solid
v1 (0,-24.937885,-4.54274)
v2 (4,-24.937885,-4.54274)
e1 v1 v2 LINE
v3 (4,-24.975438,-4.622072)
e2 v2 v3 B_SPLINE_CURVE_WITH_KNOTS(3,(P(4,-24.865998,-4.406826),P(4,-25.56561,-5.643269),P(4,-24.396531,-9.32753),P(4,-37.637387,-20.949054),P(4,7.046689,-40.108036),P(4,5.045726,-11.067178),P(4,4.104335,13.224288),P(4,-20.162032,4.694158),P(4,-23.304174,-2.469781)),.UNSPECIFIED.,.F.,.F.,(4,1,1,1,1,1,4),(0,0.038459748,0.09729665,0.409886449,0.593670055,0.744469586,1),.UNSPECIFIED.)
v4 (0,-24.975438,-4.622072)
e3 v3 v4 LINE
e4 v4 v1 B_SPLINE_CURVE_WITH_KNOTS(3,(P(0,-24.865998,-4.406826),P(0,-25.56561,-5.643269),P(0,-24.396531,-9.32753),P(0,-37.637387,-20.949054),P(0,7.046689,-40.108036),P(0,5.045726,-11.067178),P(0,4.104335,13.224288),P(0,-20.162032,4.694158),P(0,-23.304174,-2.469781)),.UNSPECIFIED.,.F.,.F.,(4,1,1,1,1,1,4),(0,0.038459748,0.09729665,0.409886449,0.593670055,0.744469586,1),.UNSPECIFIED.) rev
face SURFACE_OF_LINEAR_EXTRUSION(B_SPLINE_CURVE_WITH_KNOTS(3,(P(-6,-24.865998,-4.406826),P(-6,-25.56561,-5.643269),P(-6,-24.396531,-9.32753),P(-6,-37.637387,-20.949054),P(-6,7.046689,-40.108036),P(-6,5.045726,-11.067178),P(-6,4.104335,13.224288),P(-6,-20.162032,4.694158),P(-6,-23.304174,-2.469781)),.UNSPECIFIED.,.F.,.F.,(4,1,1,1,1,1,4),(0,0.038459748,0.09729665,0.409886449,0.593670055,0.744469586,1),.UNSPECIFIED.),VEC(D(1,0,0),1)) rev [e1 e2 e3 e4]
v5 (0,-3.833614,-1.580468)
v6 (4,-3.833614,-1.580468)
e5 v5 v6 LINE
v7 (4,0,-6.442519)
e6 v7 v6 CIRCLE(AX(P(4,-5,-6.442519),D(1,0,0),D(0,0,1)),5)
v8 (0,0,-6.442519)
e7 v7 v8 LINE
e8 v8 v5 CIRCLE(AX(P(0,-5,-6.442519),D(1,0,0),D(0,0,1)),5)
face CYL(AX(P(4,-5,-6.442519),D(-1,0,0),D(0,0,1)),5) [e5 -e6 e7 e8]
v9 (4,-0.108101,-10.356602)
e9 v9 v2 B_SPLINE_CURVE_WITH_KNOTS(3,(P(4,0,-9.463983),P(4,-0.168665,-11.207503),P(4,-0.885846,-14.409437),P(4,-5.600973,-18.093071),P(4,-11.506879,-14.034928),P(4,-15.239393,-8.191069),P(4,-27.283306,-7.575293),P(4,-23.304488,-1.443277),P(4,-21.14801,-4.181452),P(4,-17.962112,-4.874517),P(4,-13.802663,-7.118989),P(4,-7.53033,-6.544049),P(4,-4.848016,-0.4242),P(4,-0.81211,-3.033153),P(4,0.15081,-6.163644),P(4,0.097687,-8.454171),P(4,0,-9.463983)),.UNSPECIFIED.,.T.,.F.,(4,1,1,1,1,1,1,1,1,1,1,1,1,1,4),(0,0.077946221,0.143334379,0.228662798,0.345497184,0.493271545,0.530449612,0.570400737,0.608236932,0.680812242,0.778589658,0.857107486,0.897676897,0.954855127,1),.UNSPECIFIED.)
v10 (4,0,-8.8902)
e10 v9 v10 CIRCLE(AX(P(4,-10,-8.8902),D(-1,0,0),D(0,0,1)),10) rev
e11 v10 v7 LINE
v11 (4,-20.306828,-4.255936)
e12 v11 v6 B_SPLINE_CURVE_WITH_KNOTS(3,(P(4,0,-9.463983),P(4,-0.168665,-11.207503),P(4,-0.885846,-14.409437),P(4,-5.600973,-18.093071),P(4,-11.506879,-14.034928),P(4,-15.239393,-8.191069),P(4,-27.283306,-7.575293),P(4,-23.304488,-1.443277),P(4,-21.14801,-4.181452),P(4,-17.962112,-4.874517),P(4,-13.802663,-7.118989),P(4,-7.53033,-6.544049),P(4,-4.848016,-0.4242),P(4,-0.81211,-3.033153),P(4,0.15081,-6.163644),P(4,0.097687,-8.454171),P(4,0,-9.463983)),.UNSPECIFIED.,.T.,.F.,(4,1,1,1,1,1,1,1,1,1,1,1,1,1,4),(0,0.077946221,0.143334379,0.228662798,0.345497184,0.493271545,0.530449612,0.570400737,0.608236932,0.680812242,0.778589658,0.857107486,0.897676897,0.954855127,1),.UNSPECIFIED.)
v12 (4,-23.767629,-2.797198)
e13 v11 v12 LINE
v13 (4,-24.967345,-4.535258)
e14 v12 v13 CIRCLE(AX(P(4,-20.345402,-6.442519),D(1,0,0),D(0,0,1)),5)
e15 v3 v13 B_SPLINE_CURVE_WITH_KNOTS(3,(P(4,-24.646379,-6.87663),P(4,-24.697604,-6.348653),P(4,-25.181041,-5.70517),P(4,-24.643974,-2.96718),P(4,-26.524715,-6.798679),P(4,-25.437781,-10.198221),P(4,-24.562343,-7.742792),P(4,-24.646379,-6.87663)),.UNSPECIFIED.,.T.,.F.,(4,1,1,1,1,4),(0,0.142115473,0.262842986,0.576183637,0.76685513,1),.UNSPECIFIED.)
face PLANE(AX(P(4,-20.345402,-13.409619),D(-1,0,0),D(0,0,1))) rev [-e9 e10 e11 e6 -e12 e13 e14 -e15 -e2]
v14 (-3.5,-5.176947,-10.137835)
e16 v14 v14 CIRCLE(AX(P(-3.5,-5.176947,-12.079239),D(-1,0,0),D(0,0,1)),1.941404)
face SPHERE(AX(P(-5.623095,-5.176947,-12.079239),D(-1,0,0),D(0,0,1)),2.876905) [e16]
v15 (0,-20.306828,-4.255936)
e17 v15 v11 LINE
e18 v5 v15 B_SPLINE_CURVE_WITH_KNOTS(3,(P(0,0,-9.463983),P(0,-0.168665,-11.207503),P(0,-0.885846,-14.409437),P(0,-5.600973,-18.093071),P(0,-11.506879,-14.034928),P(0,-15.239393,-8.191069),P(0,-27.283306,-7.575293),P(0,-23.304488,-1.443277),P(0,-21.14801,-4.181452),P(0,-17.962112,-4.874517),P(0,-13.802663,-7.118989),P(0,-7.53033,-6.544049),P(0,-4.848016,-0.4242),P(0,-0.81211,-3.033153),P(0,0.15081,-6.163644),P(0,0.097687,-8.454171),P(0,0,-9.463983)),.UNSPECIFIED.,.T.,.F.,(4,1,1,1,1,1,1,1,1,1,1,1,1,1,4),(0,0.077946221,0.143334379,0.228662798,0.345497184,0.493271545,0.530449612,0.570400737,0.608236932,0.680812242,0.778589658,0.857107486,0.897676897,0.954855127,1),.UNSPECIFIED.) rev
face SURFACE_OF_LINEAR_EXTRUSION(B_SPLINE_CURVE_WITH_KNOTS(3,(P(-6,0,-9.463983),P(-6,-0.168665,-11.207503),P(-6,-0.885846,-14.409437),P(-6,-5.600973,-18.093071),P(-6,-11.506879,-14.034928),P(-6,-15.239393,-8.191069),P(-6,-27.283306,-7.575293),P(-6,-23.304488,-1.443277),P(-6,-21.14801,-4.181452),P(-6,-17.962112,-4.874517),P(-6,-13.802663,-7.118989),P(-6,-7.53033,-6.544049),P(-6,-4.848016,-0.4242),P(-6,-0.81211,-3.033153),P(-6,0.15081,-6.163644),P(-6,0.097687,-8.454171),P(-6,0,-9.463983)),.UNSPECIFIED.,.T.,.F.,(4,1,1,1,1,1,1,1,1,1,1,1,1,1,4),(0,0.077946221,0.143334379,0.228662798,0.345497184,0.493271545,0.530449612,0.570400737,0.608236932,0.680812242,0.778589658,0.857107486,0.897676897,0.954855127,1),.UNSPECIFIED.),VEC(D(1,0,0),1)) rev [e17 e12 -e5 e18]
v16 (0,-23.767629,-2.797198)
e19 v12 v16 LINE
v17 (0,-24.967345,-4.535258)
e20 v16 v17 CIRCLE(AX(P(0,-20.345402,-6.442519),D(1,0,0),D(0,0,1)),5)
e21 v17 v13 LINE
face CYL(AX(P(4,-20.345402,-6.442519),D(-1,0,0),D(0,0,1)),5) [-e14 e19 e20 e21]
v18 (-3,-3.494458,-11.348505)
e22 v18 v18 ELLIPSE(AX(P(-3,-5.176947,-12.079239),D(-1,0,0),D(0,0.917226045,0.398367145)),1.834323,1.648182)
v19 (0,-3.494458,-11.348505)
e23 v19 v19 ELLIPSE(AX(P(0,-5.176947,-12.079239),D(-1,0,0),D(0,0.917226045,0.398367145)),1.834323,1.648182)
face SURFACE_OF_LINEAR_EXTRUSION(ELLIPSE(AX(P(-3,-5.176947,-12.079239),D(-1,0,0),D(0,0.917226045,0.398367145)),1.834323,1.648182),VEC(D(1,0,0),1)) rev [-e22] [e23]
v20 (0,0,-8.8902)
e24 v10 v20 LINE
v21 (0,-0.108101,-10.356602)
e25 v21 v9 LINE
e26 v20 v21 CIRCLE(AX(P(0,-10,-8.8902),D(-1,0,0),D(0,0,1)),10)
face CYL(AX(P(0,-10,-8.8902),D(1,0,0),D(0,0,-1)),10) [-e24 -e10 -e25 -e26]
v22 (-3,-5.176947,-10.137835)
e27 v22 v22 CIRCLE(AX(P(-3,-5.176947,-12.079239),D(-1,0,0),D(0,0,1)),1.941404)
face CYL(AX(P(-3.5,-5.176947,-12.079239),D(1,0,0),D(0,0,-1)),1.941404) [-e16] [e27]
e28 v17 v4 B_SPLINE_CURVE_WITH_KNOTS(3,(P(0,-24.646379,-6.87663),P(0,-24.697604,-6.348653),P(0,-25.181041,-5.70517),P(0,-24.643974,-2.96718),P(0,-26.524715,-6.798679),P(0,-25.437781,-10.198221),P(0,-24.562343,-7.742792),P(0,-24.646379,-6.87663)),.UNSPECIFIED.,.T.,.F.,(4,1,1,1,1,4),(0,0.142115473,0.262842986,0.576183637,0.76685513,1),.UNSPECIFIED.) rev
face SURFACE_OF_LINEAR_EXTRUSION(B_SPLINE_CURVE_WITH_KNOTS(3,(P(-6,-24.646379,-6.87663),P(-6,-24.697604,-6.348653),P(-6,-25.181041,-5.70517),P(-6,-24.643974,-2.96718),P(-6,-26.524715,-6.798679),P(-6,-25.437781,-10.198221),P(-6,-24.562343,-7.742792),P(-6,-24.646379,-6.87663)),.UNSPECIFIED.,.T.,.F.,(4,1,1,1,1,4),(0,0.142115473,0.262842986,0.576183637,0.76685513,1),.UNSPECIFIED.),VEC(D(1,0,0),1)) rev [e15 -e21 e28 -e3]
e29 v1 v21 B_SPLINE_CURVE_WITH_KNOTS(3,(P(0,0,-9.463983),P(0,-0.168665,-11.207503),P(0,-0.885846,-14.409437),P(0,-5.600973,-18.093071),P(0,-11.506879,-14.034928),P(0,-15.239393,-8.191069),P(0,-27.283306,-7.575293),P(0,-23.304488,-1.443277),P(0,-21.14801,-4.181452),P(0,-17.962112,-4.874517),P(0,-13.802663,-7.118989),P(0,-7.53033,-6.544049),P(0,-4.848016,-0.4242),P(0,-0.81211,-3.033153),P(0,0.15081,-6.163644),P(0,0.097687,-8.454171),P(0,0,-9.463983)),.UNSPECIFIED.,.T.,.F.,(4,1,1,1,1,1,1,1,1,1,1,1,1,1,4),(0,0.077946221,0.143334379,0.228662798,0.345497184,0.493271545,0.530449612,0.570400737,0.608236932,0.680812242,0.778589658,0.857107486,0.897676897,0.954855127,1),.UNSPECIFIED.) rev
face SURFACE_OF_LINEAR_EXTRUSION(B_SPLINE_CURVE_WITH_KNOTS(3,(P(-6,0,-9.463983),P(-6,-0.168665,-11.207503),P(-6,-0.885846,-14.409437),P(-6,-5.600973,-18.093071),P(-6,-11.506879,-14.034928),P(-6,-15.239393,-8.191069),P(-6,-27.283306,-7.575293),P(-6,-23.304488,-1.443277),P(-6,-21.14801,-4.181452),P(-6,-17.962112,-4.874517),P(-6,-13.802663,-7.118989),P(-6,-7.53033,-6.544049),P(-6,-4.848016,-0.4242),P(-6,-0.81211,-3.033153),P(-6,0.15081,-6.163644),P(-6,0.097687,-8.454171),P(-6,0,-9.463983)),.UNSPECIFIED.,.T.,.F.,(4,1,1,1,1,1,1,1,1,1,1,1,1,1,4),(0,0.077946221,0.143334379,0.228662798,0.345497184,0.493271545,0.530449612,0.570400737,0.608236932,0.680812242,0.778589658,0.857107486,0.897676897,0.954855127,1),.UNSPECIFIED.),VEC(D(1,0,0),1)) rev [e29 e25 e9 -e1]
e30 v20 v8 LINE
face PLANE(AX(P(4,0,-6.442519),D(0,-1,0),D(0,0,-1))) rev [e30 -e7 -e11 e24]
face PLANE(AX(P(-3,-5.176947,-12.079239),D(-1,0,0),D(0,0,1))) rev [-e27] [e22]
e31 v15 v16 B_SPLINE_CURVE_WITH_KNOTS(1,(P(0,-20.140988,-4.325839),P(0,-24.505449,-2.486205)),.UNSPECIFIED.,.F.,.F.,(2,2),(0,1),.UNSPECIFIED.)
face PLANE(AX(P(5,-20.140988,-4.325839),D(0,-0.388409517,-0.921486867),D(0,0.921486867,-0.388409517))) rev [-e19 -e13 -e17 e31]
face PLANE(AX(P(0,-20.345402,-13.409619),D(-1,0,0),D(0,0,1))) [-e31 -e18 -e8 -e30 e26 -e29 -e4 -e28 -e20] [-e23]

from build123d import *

# Parameters (mm, degrees)
BOSS_EXTRUDE1_DEPTH = 4
CUT_EXTRUDE3_START  = -10
CUT_EXTRUDE3_DEPTH  = 10
CUT_EXTRUDE4_DEPTH  = 10
FILLET4_START       = -1
FILLET4_DEPTH       = 6
SKETCH7_RX          = 1.83432271
SKETCH7_RY          = 1.648181576
BOSS_EXTRUDE2_DEPTH = 3
SKETCH8_R           = 1.941403724
BOSS_EXTRUDE3_DEPTH = 0.5
DOME1_FACE_RADIUS   = 1.941403724
DOME1_HEIGHT        = 5
CUT_EXTRUDE5_DEPTH  = 5


with BuildPart() as part:
    # Sketch1 → Boss-Extrude1 (new body)
    with BuildSketch(Plane(origin=(0, 0, 0), x_dir=(0, 0, -1), z_dir=(1, 0, 0))):
        with BuildLine():
            Line((6.442518848, 0), (13.409619329, 0))
            ThreePointArc((13.409619329, 0), (16.945153235, -1.464466094), (18.409619329, -5))
            Line((18.409619329, -5), (18.409619329, -20.34540211))
            ThreePointArc((18.409619329, -20.34540211), (16.945153235, -23.880936016), (13.409619329, -25.34540211))
            Line((13.409619329, -25.34540211), (6.442518848, -25.34540211))
            ThreePointArc((6.442518848, -25.34540211), (2.906984942, -23.880936016), (1.442518848, -20.34540211))
            Line((1.442518848, -20.34540211), (1.442518848, -5))
            ThreePointArc((1.442518848, -5), (2.906984942, -1.464466094), (6.442518848, 0))
        make_face()
    extrude(amount=BOSS_EXTRUDE1_DEPTH)

    # Sketch2 → Cut-Extrude3 (cut)
    with BuildSketch(Plane(origin=(4, 0, 0), x_dir=(0, 0, -1), z_dir=(1, 0, 0)).offset(CUT_EXTRUDE3_START)):
        with BuildLine():
            add(Edge.make_bspline(
                [(2.42884403, -23.286077848), (2.370716158, -22.573896831), (4.185530255, -21.12926271), (4.874517164, -17.962112227), (7.118988975, -13.802662727), (6.544049448, -7.530329658), (1.569055746, -5.349803368), (1.58046752, -3.833613753)],
                knots=[0.531334438, 0.531334438, 0.531334438, 0.531334438, 0.570400737, 0.608236932, 0.680812242, 0.778589658, 0.857107486, 0.857107486, 0.857107486, 0.857107486], degree=3))
            ThreePointArc((1.58046752, -3.833613753), (1.47712578, -4.412742239), (1.442518848, -5))
            Line((1.442518848, -5), (1.442518848, -20.34540211))
            ThreePointArc((1.442518848, -20.34540211), (1.683757797, -21.87974016), (2.384196149, -23.266021372))
            add(Edge.make_bspline(
                [(2.384196149, -23.266021372), (2.399070873, -23.272759012), (2.413953527, -23.279444568), (2.428844038, -23.286077844)],
                knots=[0.998981394, 0.998981394, 0.998981394, 0.998981394, 0.999513034, 0.999513034, 0.999513034, 0.999513034], degree=3))
        make_face()
        with BuildLine():
            Line((13.409619329, 0), (9.46398266, 0))
            add(Edge.make_bspline(
                [(9.46398266, 0), (11.207503001, -0.168664697), (14.40943711, -0.885845558), (18.093070912, -5.600973008), (14.034927819, -11.50687924), (8.23474836, -15.211494887), (7.662204752, -25.591568315), (4.542739971, -24.937885151)],
                knots=[0, 0, 0, 0, 0.077946221, 0.143334379, 0.228662798, 0.345497184, 0.490655992, 0.490655992, 0.490655992, 0.490655992], degree=3))
            add(Edge.make_bspline(
                [(4.54273997, -24.937885153), (5.749127141, -25.532851997), (7.208451258, -25.09277451), (8.521498661, -25.334156754), (8.57622256, -25.34540211)],
                knots=[0.001400322, 0.001400322, 0.001400322, 0.001400322, 0.038459748, 0.040079073, 0.040079073, 0.040079073, 0.040079073], degree=3))
            Line((8.57622256, -25.34540211), (13.409619329, -25.34540211))
            ThreePointArc((13.409619329, -25.34540211), (16.945153235, -23.880936016), (18.409619329, -20.34540211))
            Line((18.409619329, -20.34540211), (18.409619329, -5))
            ThreePointArc((18.409619329, -5), (16.945153235, -1.464466094), (13.409619329, 0))
        make_face()
        with BuildLine():
            ThreePointArc((2.906984942, -1.464466094), (4.529101686, -0.380602337), (6.442518848, 0))
            add(Edge.make_bspline(
                [(6.442518848, 0), (7.443592251, 0.121124965), (8.454170968, 0.097687179), (9.46398266, 0)],
                knots=[0.954855127, 0.954855127, 0.954855127, 0.954855127, 1, 1, 1, 1], degree=3))
            Line((9.46398266, 0), (13.409619329, 0))
            ThreePointArc((13.409619329, 0), (16.945153235, -1.464466094), (18.409619329, -5))
            Line((18.409619329, -5), (18.409619329, -20.34540211))
            ThreePointArc((18.409619329, -20.34540211), (16.945153235, -23.880936016), (13.409619329, -25.34540211))
            Line((13.409619329, -25.34540211), (8.57622256, -25.34540211))
            add(Edge.make_bspline(
                [(8.57622256, -25.34540211), (10.509849295, -25.742748085), (21.004932545, -37.507061135), (40.108036136, 7.046689321), (11.067178354, 5.045725954), (-13.182357735, 4.105959789), (-4.736766595, -20.04051671), (2.384196149, -23.266021372)],
                knots=[0.040079073, 0.040079073, 0.040079073, 0.040079073, 0.09729665, 0.409886449, 0.593670055, 0.744469586, 0.998981394, 0.998981394, 0.998981394, 0.998981394], degree=3))
            ThreePointArc((2.384196149, -23.266021372), (1.683757797, -21.87974016), (1.442518848, -20.34540211))
            Line((1.442518848, -20.34540211), (1.442518848, -5))
            ThreePointArc((1.442518848, -5), (1.47712578, -4.412742239), (1.58046752, -3.833613753))
            add(Edge.make_bspline(
                [(1.58046752, -3.833613753), (1.586363874, -3.050213083), (2.186842654, -2.121305338), (2.906984942, -1.464466094)],
                knots=[0.857107486, 0.857107486, 0.857107486, 0.857107486, 0.897676897, 0.897676897, 0.897676897, 0.897676897], degree=3))
        make_face()
    extrude(amount=CUT_EXTRUDE3_DEPTH, mode=Mode.SUBTRACT)

    # Sketch6 → Cut-Extrude4 (cut)
    with BuildSketch(Plane(origin=(4, 0, 0), x_dir=(0, 0, -1), z_dir=(1, 0, 0))):
        with BuildLine():
            add(Edge.make_bspline(
                [(6.876629539, -24.646378986), (6.348652857, -24.697603605), (5.705170416, -25.181041107), (2.967179599, -24.643973727), (6.798679283, -26.524715176), (10.198220508, -25.437781208), (7.742791771, -24.562343399), (6.876629539, -24.646378986)],
                knots=[0, 0, 0, 0, 0.142115473, 0.262842986, 0.576183637, 0.76685513, 1, 1, 1, 1], degree=3))
        make_face()
    extrude(amount=-CUT_EXTRUDE4_DEPTH, mode=Mode.SUBTRACT)

    # Fillet4: read off the stored shape, not the designer's step
    # Fillet4 outline → Fillet4 (cut)
    with BuildSketch(Plane.YZ.offset(FILLET4_START)):
        with BuildLine():
            ThreePointArc((0, -8.890200058), (-0.027061887, -9.625390775), (-0.108101078, -10.356602363))
            add(Edge.make_bspline(
                [(0, -9.46398266), (-0.028832047, -9.762025236), (-0.064132076, -10.060000995), (-0.108101078, -10.356602363)],
                knots=[0, 0, 0, 0, 0.01332436, 0.01332436, 0.01332436, 0.01332436], degree=3))
            Line((0, -9.46398266), (0, -8.890200058))
        make_face()
    extrude(amount=FILLET4_DEPTH, mode=Mode.SUBTRACT)

    # Sketch7 → Boss-Extrude2 (add)
    with BuildSketch(Plane.ZY):
        with Locations(Location((-12.079238976, -5.176946967), (0, 0, 66.52385958))):
            Ellipse(SKETCH7_RX, SKETCH7_RY)
    extrude(amount=BOSS_EXTRUDE2_DEPTH)

    # Sketch8 → Boss-Extrude3 (add)
    with BuildSketch(Plane.ZY.offset(3)):
        with Locations((-12.079238976, -5.176946967)):
            Circle(SKETCH8_R)
    extrude(amount=BOSS_EXTRUDE3_DEPTH)

    # Dome1: a dome of height H over a round flat face of radius A is a cap of a sphere of radius (A * A + H * H) / (2 * H)
    dome1_r = (DOME1_FACE_RADIUS * DOME1_FACE_RADIUS + DOME1_HEIGHT * DOME1_HEIGHT) / (2 * DOME1_HEIGHT)
    dome1_base = Plane((-3.5, -5.176946967, -12.079238976), z_dir=(-1, 0, 0))
    with Locations(dome1_base.offset(DOME1_HEIGHT - dome1_r)):
        dome1_ball = Sphere(dome1_r, mode=Mode.PRIVATE)
    add(split(dome1_ball, bisect_by=dome1_base, keep=Keep.TOP, mode=Mode.PRIVATE))

    # Sketch9 → Cut-Extrude5 (cut)
    with BuildSketch(Plane.ZY):
        with BuildLine():
            Line((-4.325838527, -20.140987675), (-2.486204677, -24.505449301))
            add(Edge.make_bspline(
                [(-2.486204677, -24.505449301), (3.73593799, -24.171685926), (-2.121854058, -16.126748366), (-4.325838527, -20.140987675)],
                knots=[0, 0, 0, 0, 1, 1, 1, 1], degree=3))
        make_face()
    extrude(amount=-CUT_EXTRUDE5_DEPTH, mode=Mode.SUBTRACT)


solid = part.part
